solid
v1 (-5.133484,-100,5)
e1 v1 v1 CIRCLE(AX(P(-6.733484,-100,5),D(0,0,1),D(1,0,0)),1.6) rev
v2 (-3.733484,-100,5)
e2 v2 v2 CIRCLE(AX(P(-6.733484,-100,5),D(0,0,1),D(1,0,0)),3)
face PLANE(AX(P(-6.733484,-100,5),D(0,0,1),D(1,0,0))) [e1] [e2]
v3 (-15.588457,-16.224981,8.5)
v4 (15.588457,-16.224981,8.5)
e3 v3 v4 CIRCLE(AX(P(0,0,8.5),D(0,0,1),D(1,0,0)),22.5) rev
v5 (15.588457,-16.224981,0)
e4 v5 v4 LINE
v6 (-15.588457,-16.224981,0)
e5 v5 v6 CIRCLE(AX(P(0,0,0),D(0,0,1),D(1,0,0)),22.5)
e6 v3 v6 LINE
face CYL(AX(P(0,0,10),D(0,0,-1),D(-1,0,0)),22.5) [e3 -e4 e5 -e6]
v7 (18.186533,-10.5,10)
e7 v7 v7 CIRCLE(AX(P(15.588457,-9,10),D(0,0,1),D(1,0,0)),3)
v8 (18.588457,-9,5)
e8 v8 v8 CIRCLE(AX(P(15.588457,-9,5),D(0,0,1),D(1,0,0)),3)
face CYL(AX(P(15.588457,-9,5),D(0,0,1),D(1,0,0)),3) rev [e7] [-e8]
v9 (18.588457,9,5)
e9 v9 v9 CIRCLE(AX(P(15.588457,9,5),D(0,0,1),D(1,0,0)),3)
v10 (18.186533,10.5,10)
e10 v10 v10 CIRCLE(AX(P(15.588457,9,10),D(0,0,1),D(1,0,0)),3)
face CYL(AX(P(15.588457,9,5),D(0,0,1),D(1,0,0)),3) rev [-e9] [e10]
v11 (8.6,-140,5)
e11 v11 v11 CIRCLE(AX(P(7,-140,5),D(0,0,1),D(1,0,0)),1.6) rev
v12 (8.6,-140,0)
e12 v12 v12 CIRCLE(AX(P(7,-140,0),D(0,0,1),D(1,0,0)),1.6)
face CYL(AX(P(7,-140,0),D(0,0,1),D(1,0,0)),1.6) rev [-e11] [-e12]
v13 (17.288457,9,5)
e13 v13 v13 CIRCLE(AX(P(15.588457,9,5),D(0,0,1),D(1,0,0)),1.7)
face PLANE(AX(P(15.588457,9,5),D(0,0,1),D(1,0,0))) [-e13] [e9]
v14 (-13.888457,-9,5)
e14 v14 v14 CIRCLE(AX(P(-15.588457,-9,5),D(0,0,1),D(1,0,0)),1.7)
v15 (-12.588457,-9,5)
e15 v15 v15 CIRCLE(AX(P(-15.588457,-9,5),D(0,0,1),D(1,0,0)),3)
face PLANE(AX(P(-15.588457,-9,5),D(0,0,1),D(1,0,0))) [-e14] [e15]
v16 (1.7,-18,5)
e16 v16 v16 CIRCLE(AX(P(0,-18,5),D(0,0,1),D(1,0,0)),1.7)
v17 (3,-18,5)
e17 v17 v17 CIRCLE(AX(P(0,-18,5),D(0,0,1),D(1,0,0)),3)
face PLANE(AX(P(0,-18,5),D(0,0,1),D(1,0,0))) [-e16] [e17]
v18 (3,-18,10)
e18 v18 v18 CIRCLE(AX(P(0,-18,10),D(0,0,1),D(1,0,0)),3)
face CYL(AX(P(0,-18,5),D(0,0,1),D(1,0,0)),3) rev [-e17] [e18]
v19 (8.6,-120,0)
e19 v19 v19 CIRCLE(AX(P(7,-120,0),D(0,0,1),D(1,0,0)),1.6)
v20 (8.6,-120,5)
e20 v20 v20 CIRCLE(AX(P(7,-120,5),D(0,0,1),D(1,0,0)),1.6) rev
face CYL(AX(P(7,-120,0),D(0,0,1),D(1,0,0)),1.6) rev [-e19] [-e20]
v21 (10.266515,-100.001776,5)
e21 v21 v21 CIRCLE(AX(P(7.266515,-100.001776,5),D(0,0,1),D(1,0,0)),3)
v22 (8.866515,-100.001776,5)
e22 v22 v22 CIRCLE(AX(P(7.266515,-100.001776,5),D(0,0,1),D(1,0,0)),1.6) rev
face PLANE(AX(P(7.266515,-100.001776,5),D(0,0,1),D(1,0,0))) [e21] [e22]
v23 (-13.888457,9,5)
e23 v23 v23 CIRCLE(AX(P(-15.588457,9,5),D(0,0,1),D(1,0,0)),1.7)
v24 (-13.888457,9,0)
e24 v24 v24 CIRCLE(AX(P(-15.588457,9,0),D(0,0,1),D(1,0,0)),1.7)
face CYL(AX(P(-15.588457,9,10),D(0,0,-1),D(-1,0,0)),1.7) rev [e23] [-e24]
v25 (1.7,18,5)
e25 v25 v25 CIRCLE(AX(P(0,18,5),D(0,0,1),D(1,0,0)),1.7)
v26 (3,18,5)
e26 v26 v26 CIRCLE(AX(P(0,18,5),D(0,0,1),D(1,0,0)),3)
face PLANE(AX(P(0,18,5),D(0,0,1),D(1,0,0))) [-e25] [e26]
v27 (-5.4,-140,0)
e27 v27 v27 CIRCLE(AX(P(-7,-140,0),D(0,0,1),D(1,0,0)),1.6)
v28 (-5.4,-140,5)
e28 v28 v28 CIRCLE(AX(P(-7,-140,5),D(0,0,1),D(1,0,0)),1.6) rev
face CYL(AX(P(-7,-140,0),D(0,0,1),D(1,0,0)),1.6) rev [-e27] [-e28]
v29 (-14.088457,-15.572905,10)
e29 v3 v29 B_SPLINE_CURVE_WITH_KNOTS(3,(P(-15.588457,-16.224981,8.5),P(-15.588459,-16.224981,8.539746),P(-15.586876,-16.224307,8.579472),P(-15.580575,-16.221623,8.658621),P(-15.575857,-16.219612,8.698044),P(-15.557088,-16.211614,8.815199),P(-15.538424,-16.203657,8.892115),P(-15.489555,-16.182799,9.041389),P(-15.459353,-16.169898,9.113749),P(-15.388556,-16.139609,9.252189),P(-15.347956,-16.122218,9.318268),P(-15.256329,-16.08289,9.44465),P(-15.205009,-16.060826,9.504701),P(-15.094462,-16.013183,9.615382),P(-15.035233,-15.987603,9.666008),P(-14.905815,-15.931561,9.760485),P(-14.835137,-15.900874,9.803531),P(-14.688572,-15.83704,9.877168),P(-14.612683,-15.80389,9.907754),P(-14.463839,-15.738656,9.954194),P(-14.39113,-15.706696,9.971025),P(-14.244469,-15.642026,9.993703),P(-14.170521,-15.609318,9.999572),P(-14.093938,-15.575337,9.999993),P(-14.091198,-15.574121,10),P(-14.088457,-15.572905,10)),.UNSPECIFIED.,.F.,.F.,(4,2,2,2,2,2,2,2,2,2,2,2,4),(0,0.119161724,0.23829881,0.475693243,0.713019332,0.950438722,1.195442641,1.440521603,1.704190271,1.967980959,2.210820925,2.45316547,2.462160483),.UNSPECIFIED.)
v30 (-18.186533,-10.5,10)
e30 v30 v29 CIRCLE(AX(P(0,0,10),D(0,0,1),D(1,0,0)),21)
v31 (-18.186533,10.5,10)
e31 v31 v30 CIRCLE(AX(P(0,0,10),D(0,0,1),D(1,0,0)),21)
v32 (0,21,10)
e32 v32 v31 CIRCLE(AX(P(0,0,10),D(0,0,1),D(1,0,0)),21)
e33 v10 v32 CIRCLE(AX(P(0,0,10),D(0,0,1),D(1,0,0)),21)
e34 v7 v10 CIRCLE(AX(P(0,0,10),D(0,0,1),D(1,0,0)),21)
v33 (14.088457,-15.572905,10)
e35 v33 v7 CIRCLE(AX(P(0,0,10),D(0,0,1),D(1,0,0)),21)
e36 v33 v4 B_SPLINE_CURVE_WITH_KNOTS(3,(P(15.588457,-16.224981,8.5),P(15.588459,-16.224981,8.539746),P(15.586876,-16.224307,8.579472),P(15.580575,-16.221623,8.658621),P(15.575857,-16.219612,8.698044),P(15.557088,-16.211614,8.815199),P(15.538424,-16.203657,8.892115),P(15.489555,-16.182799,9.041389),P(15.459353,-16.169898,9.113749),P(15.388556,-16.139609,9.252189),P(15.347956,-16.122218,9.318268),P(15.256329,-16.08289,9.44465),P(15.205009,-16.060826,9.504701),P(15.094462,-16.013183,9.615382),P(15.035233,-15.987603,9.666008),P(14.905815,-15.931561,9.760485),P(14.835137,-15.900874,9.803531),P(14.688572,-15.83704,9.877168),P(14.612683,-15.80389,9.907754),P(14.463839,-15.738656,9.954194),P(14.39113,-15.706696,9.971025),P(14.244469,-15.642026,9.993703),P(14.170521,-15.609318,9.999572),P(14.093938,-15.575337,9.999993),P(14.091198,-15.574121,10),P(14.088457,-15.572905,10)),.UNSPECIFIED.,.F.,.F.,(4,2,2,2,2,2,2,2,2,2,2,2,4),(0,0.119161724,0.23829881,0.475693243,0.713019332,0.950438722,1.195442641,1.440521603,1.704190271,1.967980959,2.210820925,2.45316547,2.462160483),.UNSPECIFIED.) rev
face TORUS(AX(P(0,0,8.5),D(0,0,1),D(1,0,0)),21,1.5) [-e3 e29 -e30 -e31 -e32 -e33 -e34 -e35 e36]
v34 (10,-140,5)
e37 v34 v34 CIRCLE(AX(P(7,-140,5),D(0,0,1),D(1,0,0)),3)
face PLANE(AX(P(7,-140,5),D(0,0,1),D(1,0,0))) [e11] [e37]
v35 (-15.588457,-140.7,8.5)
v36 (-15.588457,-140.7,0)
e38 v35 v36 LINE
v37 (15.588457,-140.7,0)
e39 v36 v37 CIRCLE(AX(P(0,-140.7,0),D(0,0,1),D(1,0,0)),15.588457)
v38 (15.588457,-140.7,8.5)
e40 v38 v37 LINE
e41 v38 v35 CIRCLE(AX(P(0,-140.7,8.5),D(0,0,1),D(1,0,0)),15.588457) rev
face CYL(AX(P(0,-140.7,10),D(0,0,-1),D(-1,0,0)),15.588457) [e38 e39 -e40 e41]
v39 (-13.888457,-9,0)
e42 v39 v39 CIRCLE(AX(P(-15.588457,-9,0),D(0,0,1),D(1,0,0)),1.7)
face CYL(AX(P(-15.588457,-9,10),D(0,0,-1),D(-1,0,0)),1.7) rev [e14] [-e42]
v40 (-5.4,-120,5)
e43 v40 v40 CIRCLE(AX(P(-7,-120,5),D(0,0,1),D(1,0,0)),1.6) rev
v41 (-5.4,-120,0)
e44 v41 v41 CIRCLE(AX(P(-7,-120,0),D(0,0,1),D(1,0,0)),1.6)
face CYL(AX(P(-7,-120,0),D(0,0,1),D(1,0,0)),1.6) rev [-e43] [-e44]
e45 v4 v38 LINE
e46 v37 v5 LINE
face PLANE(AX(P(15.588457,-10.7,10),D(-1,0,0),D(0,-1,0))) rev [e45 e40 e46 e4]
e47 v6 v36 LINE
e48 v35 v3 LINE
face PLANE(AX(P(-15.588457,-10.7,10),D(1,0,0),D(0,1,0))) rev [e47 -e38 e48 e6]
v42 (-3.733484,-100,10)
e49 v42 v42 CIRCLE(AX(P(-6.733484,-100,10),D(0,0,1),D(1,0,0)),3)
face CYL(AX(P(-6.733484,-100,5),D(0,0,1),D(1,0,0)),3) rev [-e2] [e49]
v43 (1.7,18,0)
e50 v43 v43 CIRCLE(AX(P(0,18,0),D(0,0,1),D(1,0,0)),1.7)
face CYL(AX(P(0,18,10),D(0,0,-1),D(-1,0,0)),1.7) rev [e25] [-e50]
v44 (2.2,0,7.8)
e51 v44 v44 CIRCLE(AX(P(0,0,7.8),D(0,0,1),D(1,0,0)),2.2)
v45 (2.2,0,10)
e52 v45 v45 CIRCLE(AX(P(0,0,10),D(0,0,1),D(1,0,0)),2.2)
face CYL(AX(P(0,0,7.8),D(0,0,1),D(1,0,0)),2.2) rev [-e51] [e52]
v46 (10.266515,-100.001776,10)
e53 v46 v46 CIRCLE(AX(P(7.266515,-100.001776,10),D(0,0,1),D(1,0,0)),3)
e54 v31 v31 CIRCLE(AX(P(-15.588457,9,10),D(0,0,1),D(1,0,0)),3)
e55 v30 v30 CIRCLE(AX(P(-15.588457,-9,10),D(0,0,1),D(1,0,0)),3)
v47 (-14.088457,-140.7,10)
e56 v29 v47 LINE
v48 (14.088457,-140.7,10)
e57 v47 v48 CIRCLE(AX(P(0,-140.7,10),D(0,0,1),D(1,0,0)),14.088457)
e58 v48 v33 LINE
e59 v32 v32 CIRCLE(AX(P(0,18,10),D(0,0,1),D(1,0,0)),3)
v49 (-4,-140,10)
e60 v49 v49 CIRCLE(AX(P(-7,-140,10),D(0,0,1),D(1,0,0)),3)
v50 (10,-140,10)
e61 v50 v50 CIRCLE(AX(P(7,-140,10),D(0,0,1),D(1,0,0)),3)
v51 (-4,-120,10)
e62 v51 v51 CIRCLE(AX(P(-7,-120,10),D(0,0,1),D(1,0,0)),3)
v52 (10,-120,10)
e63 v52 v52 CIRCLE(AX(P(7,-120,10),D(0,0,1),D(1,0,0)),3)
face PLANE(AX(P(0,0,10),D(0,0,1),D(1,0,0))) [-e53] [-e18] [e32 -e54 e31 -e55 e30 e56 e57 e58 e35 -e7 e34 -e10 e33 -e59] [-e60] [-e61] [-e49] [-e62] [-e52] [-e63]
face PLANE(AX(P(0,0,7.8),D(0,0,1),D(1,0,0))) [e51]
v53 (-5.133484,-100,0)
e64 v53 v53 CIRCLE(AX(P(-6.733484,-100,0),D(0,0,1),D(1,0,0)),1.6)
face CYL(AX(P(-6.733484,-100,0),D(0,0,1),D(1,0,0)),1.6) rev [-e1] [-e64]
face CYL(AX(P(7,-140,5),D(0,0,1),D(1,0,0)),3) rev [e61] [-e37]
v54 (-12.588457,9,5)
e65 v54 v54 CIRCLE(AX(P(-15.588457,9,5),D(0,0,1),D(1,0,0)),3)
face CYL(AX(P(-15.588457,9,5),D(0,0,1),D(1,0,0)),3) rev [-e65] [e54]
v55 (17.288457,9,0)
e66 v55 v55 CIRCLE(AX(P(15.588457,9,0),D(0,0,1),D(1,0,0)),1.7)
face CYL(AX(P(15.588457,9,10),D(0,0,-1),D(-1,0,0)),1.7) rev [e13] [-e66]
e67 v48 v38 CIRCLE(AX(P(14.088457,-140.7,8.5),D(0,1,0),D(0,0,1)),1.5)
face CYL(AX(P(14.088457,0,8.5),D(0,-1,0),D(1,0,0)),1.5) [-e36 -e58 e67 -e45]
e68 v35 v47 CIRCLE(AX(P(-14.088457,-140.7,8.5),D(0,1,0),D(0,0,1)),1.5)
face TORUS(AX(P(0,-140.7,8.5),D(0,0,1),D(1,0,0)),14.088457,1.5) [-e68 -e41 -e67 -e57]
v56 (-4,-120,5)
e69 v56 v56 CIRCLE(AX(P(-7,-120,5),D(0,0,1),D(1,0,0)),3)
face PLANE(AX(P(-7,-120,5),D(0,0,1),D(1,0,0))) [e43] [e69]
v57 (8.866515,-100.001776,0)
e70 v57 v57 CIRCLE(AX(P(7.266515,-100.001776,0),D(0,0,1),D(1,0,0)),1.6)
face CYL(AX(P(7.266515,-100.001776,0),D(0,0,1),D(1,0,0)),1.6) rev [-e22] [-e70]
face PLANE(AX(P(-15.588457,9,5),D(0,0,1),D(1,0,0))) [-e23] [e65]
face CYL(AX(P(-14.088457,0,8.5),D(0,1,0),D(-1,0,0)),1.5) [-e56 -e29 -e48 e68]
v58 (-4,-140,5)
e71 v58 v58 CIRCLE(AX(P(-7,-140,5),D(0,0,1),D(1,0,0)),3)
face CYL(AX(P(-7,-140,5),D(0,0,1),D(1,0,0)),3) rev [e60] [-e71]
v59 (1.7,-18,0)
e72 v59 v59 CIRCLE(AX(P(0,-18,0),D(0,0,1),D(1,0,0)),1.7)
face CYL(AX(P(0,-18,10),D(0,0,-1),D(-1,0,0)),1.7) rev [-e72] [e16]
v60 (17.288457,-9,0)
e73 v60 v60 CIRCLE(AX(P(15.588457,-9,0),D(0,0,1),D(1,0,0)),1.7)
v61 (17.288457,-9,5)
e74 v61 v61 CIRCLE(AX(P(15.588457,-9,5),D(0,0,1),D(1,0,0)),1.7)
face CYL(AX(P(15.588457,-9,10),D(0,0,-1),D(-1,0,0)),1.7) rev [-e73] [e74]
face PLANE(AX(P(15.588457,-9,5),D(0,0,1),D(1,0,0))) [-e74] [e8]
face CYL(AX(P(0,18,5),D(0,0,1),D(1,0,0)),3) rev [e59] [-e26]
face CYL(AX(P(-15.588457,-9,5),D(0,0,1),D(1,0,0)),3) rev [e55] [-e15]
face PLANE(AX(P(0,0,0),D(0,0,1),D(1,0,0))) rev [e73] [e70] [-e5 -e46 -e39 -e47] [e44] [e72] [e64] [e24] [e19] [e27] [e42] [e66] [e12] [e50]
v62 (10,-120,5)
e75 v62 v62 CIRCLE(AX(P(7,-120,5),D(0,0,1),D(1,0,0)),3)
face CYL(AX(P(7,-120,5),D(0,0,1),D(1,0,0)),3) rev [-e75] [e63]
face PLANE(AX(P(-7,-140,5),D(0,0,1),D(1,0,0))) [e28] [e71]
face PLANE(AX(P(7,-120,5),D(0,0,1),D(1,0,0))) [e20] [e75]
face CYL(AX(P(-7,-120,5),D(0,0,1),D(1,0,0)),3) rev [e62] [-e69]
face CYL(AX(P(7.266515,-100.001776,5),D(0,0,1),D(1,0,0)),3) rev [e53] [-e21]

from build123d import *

# Parameters (mm, degrees)
SKETCH_1_R          = 22.5
SKETCH_1_R_2        = 1.7
EXTRUDE_1_DEPTH     = 10
EXTRUDE_2_DEPTH     = 10
FILLET_1_R          = 1.5
SKETCH_3_R          = 1.6
CUT_EXTRUDE_1_DEPTH = 159.216092453
SKETCH_5_R          = 2.2
CUT_EXTRUDE_2_DEPTH = 2.2
SKETCH_6_R          = 3
CUT_EXTRUDE_3_DEPTH = 5


# Read off the part's stored shape, not the designer's step: 凸台-拉伸2
with BuildPart() as part:
    # 草图1 → 凸台-拉伸1 (new body)
    with BuildSketch(Plane.XY):
        Circle(SKETCH_1_R)
        with Locations((-15.588457268, 9)):
            Circle(SKETCH_1_R_2, mode=Mode.SUBTRACT)
        with Locations((0, 18)):
            Circle(SKETCH_1_R_2, mode=Mode.SUBTRACT)
        with Locations((15.588457268, 9)):
            Circle(SKETCH_1_R_2, mode=Mode.SUBTRACT)
        with Locations((15.588457268, -9)):
            Circle(SKETCH_1_R_2, mode=Mode.SUBTRACT)
        with Locations((0, -18)):
            Circle(SKETCH_1_R_2, mode=Mode.SUBTRACT)
        with Locations((-15.588457268, -9)):
            Circle(SKETCH_1_R_2, mode=Mode.SUBTRACT)
    extrude(amount=EXTRUDE_1_DEPTH)

    # 凸台-拉伸2 outline → 凸台-拉伸2 (add)
    with BuildSketch(Plane.XY):
        with BuildLine():
            Line((15.588457268, -140.7), (15.588457268, -16.22498074))
            ThreePointArc((15.588457268, -16.22498074), (0, -22.5), (-15.588457268, -16.22498074))
            Line((-15.588457268, -16.22498074), (-15.588457268, -140.7))
            ThreePointArc((-15.588457268, -140.7), (0, -156.288457268), (15.588457268, -140.7))
        make_face()
    extrude(amount=EXTRUDE_2_DEPTH)

    # 圆角1
    fillet_1_edges = [part.edges().sort_by_distance(p)[0] for p in [
        (0, 22.5, 10),
        (15.588457268, -78.46249037, 10),
        (-15.588457268, -78.46249037, 10),
        (0, -156.288457268, 10),
    ]]
    fillet(fillet_1_edges, radius=FILLET_1_R)

    # 草图3 → 切除-拉伸1 (cut, through all)
    with BuildSketch(Plane.XY.offset(10)):
        with Locations((7.266515313, -100.001775839)):
            Circle(SKETCH_3_R)
        with Locations((-6.733484478, -100)):
            Circle(SKETCH_3_R)
        with Locations((7, -120)):
            Circle(SKETCH_3_R)
        with Locations((7, -140)):
            Circle(SKETCH_3_R)
        with Locations((-7, -140)):
            Circle(SKETCH_3_R)
        with Locations((-7, -120)):
            Circle(SKETCH_3_R)
    extrude(amount=-CUT_EXTRUDE_1_DEPTH, mode=Mode.SUBTRACT)

    # 草图5 → 切除-拉伸2 (cut)
    with BuildSketch(Plane.XY.offset(10)):
        Circle(SKETCH_5_R)
    extrude(amount=-CUT_EXTRUDE_2_DEPTH, mode=Mode.SUBTRACT)

    # 草图6 → 切除-拉伸3 (cut)
    with BuildSketch(Plane.XY.offset(10)):
        with Locations((-15.588457268, -9)):
            Circle(SKETCH_6_R)
        with Locations((0, -18)):
            Circle(SKETCH_6_R)
        with Locations((15.588457268, -9)):
            Circle(SKETCH_6_R)
        with Locations((15.588457268, 9)):
            Circle(SKETCH_6_R)
        with Locations((0, 18)):
            Circle(SKETCH_6_R)
        with Locations((-15.588457268, 9)):
            Circle(SKETCH_6_R)
        with Locations((-6.733484478, -100)):
            Circle(SKETCH_6_R)
        with Locations((7.266515313, -100.001775839)):
            Circle(SKETCH_6_R)
        with Locations((7, -120)):
            Circle(SKETCH_6_R)
        with Locations((-7, -120)):
            Circle(SKETCH_6_R)
        with Locations((-7, -140)):
            Circle(SKETCH_6_R)
        with Locations((7, -140)):
            Circle(SKETCH_6_R)
    extrude(amount=-CUT_EXTRUDE_3_DEPTH, mode=Mode.SUBTRACT)


solid = part.part
